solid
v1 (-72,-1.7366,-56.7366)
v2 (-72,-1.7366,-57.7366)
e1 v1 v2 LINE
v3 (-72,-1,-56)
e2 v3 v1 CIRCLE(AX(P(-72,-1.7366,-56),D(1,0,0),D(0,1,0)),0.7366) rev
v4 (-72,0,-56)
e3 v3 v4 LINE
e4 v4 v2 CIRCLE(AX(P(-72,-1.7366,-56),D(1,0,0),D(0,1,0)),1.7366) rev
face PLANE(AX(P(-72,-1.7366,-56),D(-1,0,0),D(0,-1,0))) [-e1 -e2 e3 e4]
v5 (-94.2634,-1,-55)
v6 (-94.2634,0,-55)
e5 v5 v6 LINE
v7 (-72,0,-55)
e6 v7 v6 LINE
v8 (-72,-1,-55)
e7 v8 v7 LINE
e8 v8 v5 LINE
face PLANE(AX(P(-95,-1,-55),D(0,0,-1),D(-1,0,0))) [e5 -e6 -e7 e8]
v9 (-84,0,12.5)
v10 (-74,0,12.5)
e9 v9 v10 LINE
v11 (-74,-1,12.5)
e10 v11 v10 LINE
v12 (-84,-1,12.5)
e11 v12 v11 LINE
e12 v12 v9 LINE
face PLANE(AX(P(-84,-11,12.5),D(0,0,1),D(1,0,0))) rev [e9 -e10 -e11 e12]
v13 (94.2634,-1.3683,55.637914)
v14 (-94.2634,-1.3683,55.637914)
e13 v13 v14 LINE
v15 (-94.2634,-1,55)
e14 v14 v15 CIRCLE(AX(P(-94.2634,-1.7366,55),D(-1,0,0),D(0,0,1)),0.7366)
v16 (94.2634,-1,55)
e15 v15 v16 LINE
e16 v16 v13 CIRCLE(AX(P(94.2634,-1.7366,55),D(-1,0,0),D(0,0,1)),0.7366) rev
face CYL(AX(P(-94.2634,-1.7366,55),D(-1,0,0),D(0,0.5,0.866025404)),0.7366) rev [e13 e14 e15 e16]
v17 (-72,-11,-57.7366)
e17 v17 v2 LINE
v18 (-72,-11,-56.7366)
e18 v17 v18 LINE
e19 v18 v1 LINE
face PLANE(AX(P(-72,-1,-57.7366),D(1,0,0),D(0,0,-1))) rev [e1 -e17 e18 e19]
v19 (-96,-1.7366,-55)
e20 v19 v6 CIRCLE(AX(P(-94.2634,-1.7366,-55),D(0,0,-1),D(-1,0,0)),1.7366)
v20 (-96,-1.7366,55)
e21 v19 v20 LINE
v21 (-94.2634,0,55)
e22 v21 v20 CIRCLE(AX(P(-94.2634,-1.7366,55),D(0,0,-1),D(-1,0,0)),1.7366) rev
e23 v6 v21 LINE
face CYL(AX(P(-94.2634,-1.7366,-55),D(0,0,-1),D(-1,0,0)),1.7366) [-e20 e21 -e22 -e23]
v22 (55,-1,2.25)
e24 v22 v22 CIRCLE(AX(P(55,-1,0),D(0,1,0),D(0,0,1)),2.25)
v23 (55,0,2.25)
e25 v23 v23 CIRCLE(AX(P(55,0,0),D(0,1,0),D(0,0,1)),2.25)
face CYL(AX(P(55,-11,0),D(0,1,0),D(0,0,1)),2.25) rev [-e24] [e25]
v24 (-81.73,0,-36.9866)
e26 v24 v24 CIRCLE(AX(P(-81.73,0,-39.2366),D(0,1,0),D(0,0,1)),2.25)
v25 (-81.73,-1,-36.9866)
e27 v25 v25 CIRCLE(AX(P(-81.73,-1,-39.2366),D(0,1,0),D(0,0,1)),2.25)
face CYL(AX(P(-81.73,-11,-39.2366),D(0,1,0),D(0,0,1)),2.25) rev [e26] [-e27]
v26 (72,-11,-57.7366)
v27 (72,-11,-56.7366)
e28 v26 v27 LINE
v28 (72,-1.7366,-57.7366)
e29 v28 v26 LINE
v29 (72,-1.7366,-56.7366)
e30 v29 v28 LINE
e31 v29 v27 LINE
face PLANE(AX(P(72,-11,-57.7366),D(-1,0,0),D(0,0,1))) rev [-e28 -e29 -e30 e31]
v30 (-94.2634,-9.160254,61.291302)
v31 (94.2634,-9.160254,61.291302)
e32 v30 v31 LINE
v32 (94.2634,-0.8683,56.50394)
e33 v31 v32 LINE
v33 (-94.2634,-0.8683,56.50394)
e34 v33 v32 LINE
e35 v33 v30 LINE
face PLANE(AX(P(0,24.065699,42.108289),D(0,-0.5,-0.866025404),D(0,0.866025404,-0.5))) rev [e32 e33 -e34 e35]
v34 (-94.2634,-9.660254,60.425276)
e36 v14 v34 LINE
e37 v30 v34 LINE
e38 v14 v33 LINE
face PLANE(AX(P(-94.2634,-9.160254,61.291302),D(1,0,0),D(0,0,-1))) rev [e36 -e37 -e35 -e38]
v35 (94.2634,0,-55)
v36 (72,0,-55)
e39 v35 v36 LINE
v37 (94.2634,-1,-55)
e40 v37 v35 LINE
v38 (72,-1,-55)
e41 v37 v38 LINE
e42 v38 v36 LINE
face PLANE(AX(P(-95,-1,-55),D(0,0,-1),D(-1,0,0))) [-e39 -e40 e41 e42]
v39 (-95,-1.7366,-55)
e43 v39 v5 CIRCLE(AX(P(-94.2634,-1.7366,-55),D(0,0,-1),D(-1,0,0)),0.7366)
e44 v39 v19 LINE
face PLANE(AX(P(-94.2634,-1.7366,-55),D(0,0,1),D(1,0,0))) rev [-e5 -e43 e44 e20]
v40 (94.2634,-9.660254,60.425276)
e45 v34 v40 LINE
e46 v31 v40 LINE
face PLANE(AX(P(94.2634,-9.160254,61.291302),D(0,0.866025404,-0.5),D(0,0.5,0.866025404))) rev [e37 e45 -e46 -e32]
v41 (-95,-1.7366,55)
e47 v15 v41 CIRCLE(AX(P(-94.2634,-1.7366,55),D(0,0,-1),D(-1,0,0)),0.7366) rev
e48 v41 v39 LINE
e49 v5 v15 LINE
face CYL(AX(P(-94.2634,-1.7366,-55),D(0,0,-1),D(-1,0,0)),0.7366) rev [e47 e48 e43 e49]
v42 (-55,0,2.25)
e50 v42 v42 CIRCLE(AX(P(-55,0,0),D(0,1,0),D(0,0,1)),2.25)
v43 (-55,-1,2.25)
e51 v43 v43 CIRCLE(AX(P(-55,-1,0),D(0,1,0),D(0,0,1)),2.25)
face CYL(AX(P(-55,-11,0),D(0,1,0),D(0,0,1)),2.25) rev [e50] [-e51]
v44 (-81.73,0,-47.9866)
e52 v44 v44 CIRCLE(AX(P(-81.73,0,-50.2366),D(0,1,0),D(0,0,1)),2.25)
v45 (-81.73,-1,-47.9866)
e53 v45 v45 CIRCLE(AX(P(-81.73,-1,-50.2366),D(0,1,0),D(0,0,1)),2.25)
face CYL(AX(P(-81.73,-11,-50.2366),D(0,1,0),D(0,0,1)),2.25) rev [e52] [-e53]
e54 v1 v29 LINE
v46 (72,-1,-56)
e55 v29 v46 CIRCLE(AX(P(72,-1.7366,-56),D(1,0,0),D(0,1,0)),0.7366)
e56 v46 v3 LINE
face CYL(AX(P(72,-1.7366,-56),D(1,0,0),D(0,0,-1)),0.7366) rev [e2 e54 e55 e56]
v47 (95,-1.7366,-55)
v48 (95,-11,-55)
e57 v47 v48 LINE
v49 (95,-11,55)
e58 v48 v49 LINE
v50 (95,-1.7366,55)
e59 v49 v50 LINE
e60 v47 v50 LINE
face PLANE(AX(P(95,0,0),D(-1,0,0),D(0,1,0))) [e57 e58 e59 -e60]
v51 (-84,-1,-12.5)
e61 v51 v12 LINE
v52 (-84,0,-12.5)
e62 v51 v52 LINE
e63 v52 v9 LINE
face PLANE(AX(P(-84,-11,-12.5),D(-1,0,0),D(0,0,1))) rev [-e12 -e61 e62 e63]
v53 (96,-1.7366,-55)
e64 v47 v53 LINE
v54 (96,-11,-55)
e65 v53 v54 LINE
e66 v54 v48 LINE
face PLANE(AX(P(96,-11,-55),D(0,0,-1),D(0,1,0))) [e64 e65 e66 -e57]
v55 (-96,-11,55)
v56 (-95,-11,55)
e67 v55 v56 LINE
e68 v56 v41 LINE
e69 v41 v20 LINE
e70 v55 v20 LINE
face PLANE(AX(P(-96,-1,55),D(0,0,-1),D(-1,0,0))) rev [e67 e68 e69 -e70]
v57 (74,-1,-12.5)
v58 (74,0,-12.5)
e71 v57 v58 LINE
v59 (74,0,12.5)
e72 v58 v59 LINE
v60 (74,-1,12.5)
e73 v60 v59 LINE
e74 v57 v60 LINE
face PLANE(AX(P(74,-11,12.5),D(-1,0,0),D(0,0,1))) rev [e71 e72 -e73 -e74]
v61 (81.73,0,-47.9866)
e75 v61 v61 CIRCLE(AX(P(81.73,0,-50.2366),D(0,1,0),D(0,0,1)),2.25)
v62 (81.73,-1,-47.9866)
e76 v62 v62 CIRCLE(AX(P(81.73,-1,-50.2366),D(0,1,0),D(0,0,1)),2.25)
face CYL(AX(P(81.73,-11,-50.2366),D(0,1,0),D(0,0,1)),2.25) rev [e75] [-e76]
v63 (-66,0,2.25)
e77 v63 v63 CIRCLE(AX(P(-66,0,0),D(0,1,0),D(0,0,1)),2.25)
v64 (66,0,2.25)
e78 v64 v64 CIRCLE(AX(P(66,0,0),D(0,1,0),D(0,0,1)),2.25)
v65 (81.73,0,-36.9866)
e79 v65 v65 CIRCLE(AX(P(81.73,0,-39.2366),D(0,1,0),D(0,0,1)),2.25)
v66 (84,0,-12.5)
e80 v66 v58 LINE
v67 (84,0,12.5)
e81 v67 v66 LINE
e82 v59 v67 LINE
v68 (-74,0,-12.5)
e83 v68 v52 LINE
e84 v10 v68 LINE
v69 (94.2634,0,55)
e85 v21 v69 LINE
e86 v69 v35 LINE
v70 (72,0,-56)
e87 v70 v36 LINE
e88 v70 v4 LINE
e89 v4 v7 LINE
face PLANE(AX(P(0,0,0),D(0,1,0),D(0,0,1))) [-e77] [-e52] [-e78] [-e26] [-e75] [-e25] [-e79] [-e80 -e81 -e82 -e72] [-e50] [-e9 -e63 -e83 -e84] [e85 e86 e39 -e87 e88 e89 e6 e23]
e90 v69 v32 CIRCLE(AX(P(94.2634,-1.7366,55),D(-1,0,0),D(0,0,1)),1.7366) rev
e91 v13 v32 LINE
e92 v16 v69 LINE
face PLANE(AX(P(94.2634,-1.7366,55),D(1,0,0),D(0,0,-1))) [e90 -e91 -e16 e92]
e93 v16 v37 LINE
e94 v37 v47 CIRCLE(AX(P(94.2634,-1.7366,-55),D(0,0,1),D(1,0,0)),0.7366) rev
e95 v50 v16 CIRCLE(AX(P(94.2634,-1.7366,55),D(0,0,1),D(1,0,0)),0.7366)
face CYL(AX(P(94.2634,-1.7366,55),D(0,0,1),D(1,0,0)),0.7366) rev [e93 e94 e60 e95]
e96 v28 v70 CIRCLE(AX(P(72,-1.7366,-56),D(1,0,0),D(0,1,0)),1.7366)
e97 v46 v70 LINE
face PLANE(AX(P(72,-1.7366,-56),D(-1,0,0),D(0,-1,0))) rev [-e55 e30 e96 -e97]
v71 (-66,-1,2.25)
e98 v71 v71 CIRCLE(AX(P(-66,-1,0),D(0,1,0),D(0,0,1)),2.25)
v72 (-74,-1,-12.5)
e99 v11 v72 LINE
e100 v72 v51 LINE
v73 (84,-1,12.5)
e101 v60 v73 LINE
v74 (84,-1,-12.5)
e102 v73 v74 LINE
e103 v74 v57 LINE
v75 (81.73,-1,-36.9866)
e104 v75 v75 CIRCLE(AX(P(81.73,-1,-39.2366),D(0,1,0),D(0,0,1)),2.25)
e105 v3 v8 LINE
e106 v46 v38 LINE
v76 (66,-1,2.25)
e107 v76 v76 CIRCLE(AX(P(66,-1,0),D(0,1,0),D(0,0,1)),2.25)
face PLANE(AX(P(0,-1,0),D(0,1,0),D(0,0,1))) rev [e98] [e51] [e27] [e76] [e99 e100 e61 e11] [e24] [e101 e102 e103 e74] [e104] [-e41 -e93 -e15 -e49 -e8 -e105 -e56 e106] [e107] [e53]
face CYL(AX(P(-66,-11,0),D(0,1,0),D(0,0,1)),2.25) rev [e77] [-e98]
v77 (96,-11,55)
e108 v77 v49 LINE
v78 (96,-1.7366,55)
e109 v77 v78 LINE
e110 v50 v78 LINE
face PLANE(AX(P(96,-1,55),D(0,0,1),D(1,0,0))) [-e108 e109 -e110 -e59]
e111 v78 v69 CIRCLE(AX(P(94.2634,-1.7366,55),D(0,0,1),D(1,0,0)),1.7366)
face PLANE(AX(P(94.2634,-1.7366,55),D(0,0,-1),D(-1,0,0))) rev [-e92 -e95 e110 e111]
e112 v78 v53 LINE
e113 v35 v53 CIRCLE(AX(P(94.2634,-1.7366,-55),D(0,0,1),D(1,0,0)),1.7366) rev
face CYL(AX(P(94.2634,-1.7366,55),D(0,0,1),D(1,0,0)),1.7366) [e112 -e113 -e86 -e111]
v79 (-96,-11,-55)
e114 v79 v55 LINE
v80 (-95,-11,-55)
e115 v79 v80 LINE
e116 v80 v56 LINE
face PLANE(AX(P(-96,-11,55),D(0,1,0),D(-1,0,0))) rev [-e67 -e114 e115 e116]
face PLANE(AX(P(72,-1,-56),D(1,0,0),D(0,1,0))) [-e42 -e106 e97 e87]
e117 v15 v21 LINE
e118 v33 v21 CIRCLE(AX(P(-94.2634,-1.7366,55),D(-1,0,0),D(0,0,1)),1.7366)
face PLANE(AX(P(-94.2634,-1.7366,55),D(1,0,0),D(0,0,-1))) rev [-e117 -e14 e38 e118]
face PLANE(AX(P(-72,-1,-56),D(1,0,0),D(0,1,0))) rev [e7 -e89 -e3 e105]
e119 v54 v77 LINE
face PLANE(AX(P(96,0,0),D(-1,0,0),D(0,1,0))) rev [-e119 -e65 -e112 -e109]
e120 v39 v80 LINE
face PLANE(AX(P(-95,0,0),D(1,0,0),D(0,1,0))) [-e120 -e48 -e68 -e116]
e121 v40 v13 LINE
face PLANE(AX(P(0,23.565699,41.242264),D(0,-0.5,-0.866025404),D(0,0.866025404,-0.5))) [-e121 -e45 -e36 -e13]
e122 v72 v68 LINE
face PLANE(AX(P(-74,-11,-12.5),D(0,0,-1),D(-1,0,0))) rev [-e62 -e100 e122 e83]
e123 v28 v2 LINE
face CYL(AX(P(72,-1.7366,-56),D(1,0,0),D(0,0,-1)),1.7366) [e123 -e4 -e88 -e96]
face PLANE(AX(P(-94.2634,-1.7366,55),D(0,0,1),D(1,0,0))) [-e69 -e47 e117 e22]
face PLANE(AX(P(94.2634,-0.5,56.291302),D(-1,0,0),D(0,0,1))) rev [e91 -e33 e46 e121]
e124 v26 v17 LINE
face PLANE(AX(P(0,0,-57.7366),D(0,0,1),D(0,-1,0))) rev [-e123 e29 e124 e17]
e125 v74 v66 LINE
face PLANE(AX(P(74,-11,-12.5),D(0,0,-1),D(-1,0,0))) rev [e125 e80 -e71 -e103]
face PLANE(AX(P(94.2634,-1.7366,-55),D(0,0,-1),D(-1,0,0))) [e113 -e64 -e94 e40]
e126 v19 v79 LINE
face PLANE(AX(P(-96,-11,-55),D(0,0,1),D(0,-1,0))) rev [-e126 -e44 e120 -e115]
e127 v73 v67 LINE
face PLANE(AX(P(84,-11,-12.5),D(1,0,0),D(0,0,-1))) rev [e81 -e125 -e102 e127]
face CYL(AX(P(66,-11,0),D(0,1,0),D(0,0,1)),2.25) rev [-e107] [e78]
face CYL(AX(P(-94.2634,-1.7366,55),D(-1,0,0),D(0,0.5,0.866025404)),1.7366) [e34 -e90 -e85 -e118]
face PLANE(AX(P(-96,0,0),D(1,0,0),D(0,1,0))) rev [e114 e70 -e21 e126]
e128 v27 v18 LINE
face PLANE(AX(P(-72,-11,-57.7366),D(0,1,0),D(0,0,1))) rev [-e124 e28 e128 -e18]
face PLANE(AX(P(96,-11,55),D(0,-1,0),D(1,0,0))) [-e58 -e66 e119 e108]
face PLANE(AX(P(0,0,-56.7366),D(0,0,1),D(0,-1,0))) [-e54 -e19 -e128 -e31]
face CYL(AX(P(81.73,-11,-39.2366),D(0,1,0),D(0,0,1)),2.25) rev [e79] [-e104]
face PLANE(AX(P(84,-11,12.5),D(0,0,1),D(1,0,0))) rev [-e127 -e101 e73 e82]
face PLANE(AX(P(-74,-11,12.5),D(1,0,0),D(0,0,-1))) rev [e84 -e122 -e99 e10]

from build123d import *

# Parameters (mm, degrees)
SKETCH1_W                    = 190
SKETCH1_H                    = 110
BASE_FLANGE1_DEPTH           = 1
EDGE_FLANGE1_START           = -72
EDGE_FLANGE1_DEPTH           = 144
EDGE_FLANGE2_STRIP_W         = 5.4732
EDGE_FLANGE2_STRIP_H         = 1
EDGE_FLANGE2_STRIP_CUT_DEPTH = 110
EDGE_FLANGE2_DEPTH           = 110
EDGE_FLANGE3_DEPTH           = 188.5268
SKETCH17_R                   = 2.25
SKETCH17_W                   = 10
SKETCH17_H                   = 25
CUT_EXTRUDE1_DEPTH           = 115.427372832
SKETCH18_R                   = 2.25
CUT_EXTRUDE2_DEPTH           = 115.427372832


# Read off the part's stored shape, not the designer's step: Edge-Flange1
# Sheet-metal steps are written as plain solids
with BuildPart() as part:
    # Sketch1 → Base-Flange1 (new body)
    with BuildSketch(Plane(origin=(0, 0, 0), x_dir=(1, 0, 0), z_dir=(0, 1, 0))):
        Rectangle(SKETCH1_W, SKETCH1_H)
    extrude(amount=-BASE_FLANGE1_DEPTH)

    # Edge-Flange1 outline → Edge-Flange1 (add)
    with BuildSketch(Plane.YZ.offset(EDGE_FLANGE1_START)):
        with BuildLine():
            Line((-11, -57.7366), (-1.7366, -57.7366))
            ThreePointArc((-1.7366, -57.7366), (-0.508638364, -57.227961636), (0, -56))
            Line((0, -56), (0, -55))
            Line((0, -55), (-1, -55))
            Line((-1, -55), (-1, -56))
            ThreePointArc((-1, -56), (-1.215745145, -56.520854855), (-1.7366, -56.7366))
            Line((-1.7366, -56.7366), (-11, -56.7366))
            Line((-11, -56.7366), (-11, -57.7366))
        make_face()
    extrude(amount=EDGE_FLANGE1_DEPTH)

    # Edge-Flange2 strip (across the edge) → Edge-Flange2 strip cut (cut)
    with BuildSketch(Plane(origin=(-95, -1, 55), x_dir=(1, 0, 0), z_dir=(0, 0, -1))):
        with Locations((-2, -0.5)):
            Rectangle(EDGE_FLANGE2_STRIP_W, EDGE_FLANGE2_STRIP_H)
    edge_flange2_strip_cut = extrude(amount=EDGE_FLANGE2_STRIP_CUT_DEPTH, mode=Mode.SUBTRACT)

    # Edge-Flange2 section (across the edge) → Edge-Flange2 (add)
    with BuildSketch(Plane(origin=(-95, -1, 55), x_dir=(1, 0, 0), z_dir=(0, 0, -1))):
        with BuildLine():
            Line((-1, 0.7366), (-1, 10))
            Line((-1, 10), (0, 10))
            Line((0, 10), (0, 0.7366))
            ThreePointArc((0, 0.7366), (0.215745145, 0.215745145), (0.7366, 0))
            Line((0.7366, 0), (0.7366, -1))
            ThreePointArc((0.7366, -1), (-0.491361636, -0.491361636), (-1, 0.7366))
        make_face()
    edge_flange2 = extrude(amount=EDGE_FLANGE2_DEPTH)

    # Mirror1: Edge-Flange2 strip cut, Edge-Flange2 across plane
    add(edge_flange2_strip_cut.mirror(Plane(origin=(0, 0, 0), x_dir=(0, 0, 1), z_dir=(1, 0, 0))), mode=Mode.SUBTRACT)
    add(edge_flange2.mirror(Plane(origin=(0, 0, 0), x_dir=(0, 0, 1), z_dir=(1, 0, 0))))

    # Edge-Flange3 section (across the edge) → Edge-Flange3 (add)
    with BuildSketch(Plane(origin=(94.2634, -1, 55.425276208), x_dir=(0, -0.5000000000000041, -0.8660254037844364), z_dir=(-1, 0, 0))):
        with BuildLine():
            Line((-1, 0.425276208), (-1, 10))
            Line((-1, 10), (0, 10))
            Line((0, 10), (0, 0.425276208))
            ThreePointArc((0, 0.425276208), (0.098685688, 0.056976208), (0.3683, -0.212638104))
            Line((0.3683, -0.212638104), (-0.1317, -1.078663508))
            ThreePointArc((-0.1317, -1.078663508), (-0.767339716, -0.443023792), (-1, 0.425276208))
        make_face()
    extrude(amount=EDGE_FLANGE3_DEPTH)

    # Sketch17 → Cut-Extrude1 (cut, through all)
    with BuildSketch(Plane(origin=(0, 0, 0), x_dir=(1, 0, 0), z_dir=(0, 1, 0))):
        with Locations(Location((66, 0, 0), (0, 0, 270))):
            Circle(SKETCH17_R)
        with Locations(Location((55, 0, 0), (0, 0, 270))):
            Circle(SKETCH17_R)
        with Locations(Location((-55, 0, 0), (0, 0, 270))):
            Circle(SKETCH17_R)
        with Locations(Location((-66, 0, 0), (0, 0, 270))):
            Circle(SKETCH17_R)
        with Locations((79, 0)):
            Rectangle(SKETCH17_W, SKETCH17_H)
        with Locations((-79, 0)):
            Rectangle(SKETCH17_W, SKETCH17_H)
    extrude(amount=-CUT_EXTRUDE1_DEPTH, mode=Mode.SUBTRACT)

    # Sketch18 → Cut-Extrude2 (cut, through all)
    with BuildSketch(Plane(origin=(0, 0, 0), x_dir=(1, 0, 0), z_dir=(0, 1, 0))):
        with Locations(Location((81.73, 50.2366, 0), (0, 0, 270))):
            Circle(SKETCH18_R)
        with Locations(Location((81.73, 39.2366, 0), (0, 0, 270))):
            Circle(SKETCH18_R)
        with Locations(Location((-81.73, 39.2366, 0), (0, 0, 270))):
            Circle(SKETCH18_R)
        with Locations(Location((-81.73, 50.2366, 0), (0, 0, 270))):
            Circle(SKETCH18_R)
    extrude(amount=-CUT_EXTRUDE2_DEPTH, mode=Mode.SUBTRACT)


solid = part.part
